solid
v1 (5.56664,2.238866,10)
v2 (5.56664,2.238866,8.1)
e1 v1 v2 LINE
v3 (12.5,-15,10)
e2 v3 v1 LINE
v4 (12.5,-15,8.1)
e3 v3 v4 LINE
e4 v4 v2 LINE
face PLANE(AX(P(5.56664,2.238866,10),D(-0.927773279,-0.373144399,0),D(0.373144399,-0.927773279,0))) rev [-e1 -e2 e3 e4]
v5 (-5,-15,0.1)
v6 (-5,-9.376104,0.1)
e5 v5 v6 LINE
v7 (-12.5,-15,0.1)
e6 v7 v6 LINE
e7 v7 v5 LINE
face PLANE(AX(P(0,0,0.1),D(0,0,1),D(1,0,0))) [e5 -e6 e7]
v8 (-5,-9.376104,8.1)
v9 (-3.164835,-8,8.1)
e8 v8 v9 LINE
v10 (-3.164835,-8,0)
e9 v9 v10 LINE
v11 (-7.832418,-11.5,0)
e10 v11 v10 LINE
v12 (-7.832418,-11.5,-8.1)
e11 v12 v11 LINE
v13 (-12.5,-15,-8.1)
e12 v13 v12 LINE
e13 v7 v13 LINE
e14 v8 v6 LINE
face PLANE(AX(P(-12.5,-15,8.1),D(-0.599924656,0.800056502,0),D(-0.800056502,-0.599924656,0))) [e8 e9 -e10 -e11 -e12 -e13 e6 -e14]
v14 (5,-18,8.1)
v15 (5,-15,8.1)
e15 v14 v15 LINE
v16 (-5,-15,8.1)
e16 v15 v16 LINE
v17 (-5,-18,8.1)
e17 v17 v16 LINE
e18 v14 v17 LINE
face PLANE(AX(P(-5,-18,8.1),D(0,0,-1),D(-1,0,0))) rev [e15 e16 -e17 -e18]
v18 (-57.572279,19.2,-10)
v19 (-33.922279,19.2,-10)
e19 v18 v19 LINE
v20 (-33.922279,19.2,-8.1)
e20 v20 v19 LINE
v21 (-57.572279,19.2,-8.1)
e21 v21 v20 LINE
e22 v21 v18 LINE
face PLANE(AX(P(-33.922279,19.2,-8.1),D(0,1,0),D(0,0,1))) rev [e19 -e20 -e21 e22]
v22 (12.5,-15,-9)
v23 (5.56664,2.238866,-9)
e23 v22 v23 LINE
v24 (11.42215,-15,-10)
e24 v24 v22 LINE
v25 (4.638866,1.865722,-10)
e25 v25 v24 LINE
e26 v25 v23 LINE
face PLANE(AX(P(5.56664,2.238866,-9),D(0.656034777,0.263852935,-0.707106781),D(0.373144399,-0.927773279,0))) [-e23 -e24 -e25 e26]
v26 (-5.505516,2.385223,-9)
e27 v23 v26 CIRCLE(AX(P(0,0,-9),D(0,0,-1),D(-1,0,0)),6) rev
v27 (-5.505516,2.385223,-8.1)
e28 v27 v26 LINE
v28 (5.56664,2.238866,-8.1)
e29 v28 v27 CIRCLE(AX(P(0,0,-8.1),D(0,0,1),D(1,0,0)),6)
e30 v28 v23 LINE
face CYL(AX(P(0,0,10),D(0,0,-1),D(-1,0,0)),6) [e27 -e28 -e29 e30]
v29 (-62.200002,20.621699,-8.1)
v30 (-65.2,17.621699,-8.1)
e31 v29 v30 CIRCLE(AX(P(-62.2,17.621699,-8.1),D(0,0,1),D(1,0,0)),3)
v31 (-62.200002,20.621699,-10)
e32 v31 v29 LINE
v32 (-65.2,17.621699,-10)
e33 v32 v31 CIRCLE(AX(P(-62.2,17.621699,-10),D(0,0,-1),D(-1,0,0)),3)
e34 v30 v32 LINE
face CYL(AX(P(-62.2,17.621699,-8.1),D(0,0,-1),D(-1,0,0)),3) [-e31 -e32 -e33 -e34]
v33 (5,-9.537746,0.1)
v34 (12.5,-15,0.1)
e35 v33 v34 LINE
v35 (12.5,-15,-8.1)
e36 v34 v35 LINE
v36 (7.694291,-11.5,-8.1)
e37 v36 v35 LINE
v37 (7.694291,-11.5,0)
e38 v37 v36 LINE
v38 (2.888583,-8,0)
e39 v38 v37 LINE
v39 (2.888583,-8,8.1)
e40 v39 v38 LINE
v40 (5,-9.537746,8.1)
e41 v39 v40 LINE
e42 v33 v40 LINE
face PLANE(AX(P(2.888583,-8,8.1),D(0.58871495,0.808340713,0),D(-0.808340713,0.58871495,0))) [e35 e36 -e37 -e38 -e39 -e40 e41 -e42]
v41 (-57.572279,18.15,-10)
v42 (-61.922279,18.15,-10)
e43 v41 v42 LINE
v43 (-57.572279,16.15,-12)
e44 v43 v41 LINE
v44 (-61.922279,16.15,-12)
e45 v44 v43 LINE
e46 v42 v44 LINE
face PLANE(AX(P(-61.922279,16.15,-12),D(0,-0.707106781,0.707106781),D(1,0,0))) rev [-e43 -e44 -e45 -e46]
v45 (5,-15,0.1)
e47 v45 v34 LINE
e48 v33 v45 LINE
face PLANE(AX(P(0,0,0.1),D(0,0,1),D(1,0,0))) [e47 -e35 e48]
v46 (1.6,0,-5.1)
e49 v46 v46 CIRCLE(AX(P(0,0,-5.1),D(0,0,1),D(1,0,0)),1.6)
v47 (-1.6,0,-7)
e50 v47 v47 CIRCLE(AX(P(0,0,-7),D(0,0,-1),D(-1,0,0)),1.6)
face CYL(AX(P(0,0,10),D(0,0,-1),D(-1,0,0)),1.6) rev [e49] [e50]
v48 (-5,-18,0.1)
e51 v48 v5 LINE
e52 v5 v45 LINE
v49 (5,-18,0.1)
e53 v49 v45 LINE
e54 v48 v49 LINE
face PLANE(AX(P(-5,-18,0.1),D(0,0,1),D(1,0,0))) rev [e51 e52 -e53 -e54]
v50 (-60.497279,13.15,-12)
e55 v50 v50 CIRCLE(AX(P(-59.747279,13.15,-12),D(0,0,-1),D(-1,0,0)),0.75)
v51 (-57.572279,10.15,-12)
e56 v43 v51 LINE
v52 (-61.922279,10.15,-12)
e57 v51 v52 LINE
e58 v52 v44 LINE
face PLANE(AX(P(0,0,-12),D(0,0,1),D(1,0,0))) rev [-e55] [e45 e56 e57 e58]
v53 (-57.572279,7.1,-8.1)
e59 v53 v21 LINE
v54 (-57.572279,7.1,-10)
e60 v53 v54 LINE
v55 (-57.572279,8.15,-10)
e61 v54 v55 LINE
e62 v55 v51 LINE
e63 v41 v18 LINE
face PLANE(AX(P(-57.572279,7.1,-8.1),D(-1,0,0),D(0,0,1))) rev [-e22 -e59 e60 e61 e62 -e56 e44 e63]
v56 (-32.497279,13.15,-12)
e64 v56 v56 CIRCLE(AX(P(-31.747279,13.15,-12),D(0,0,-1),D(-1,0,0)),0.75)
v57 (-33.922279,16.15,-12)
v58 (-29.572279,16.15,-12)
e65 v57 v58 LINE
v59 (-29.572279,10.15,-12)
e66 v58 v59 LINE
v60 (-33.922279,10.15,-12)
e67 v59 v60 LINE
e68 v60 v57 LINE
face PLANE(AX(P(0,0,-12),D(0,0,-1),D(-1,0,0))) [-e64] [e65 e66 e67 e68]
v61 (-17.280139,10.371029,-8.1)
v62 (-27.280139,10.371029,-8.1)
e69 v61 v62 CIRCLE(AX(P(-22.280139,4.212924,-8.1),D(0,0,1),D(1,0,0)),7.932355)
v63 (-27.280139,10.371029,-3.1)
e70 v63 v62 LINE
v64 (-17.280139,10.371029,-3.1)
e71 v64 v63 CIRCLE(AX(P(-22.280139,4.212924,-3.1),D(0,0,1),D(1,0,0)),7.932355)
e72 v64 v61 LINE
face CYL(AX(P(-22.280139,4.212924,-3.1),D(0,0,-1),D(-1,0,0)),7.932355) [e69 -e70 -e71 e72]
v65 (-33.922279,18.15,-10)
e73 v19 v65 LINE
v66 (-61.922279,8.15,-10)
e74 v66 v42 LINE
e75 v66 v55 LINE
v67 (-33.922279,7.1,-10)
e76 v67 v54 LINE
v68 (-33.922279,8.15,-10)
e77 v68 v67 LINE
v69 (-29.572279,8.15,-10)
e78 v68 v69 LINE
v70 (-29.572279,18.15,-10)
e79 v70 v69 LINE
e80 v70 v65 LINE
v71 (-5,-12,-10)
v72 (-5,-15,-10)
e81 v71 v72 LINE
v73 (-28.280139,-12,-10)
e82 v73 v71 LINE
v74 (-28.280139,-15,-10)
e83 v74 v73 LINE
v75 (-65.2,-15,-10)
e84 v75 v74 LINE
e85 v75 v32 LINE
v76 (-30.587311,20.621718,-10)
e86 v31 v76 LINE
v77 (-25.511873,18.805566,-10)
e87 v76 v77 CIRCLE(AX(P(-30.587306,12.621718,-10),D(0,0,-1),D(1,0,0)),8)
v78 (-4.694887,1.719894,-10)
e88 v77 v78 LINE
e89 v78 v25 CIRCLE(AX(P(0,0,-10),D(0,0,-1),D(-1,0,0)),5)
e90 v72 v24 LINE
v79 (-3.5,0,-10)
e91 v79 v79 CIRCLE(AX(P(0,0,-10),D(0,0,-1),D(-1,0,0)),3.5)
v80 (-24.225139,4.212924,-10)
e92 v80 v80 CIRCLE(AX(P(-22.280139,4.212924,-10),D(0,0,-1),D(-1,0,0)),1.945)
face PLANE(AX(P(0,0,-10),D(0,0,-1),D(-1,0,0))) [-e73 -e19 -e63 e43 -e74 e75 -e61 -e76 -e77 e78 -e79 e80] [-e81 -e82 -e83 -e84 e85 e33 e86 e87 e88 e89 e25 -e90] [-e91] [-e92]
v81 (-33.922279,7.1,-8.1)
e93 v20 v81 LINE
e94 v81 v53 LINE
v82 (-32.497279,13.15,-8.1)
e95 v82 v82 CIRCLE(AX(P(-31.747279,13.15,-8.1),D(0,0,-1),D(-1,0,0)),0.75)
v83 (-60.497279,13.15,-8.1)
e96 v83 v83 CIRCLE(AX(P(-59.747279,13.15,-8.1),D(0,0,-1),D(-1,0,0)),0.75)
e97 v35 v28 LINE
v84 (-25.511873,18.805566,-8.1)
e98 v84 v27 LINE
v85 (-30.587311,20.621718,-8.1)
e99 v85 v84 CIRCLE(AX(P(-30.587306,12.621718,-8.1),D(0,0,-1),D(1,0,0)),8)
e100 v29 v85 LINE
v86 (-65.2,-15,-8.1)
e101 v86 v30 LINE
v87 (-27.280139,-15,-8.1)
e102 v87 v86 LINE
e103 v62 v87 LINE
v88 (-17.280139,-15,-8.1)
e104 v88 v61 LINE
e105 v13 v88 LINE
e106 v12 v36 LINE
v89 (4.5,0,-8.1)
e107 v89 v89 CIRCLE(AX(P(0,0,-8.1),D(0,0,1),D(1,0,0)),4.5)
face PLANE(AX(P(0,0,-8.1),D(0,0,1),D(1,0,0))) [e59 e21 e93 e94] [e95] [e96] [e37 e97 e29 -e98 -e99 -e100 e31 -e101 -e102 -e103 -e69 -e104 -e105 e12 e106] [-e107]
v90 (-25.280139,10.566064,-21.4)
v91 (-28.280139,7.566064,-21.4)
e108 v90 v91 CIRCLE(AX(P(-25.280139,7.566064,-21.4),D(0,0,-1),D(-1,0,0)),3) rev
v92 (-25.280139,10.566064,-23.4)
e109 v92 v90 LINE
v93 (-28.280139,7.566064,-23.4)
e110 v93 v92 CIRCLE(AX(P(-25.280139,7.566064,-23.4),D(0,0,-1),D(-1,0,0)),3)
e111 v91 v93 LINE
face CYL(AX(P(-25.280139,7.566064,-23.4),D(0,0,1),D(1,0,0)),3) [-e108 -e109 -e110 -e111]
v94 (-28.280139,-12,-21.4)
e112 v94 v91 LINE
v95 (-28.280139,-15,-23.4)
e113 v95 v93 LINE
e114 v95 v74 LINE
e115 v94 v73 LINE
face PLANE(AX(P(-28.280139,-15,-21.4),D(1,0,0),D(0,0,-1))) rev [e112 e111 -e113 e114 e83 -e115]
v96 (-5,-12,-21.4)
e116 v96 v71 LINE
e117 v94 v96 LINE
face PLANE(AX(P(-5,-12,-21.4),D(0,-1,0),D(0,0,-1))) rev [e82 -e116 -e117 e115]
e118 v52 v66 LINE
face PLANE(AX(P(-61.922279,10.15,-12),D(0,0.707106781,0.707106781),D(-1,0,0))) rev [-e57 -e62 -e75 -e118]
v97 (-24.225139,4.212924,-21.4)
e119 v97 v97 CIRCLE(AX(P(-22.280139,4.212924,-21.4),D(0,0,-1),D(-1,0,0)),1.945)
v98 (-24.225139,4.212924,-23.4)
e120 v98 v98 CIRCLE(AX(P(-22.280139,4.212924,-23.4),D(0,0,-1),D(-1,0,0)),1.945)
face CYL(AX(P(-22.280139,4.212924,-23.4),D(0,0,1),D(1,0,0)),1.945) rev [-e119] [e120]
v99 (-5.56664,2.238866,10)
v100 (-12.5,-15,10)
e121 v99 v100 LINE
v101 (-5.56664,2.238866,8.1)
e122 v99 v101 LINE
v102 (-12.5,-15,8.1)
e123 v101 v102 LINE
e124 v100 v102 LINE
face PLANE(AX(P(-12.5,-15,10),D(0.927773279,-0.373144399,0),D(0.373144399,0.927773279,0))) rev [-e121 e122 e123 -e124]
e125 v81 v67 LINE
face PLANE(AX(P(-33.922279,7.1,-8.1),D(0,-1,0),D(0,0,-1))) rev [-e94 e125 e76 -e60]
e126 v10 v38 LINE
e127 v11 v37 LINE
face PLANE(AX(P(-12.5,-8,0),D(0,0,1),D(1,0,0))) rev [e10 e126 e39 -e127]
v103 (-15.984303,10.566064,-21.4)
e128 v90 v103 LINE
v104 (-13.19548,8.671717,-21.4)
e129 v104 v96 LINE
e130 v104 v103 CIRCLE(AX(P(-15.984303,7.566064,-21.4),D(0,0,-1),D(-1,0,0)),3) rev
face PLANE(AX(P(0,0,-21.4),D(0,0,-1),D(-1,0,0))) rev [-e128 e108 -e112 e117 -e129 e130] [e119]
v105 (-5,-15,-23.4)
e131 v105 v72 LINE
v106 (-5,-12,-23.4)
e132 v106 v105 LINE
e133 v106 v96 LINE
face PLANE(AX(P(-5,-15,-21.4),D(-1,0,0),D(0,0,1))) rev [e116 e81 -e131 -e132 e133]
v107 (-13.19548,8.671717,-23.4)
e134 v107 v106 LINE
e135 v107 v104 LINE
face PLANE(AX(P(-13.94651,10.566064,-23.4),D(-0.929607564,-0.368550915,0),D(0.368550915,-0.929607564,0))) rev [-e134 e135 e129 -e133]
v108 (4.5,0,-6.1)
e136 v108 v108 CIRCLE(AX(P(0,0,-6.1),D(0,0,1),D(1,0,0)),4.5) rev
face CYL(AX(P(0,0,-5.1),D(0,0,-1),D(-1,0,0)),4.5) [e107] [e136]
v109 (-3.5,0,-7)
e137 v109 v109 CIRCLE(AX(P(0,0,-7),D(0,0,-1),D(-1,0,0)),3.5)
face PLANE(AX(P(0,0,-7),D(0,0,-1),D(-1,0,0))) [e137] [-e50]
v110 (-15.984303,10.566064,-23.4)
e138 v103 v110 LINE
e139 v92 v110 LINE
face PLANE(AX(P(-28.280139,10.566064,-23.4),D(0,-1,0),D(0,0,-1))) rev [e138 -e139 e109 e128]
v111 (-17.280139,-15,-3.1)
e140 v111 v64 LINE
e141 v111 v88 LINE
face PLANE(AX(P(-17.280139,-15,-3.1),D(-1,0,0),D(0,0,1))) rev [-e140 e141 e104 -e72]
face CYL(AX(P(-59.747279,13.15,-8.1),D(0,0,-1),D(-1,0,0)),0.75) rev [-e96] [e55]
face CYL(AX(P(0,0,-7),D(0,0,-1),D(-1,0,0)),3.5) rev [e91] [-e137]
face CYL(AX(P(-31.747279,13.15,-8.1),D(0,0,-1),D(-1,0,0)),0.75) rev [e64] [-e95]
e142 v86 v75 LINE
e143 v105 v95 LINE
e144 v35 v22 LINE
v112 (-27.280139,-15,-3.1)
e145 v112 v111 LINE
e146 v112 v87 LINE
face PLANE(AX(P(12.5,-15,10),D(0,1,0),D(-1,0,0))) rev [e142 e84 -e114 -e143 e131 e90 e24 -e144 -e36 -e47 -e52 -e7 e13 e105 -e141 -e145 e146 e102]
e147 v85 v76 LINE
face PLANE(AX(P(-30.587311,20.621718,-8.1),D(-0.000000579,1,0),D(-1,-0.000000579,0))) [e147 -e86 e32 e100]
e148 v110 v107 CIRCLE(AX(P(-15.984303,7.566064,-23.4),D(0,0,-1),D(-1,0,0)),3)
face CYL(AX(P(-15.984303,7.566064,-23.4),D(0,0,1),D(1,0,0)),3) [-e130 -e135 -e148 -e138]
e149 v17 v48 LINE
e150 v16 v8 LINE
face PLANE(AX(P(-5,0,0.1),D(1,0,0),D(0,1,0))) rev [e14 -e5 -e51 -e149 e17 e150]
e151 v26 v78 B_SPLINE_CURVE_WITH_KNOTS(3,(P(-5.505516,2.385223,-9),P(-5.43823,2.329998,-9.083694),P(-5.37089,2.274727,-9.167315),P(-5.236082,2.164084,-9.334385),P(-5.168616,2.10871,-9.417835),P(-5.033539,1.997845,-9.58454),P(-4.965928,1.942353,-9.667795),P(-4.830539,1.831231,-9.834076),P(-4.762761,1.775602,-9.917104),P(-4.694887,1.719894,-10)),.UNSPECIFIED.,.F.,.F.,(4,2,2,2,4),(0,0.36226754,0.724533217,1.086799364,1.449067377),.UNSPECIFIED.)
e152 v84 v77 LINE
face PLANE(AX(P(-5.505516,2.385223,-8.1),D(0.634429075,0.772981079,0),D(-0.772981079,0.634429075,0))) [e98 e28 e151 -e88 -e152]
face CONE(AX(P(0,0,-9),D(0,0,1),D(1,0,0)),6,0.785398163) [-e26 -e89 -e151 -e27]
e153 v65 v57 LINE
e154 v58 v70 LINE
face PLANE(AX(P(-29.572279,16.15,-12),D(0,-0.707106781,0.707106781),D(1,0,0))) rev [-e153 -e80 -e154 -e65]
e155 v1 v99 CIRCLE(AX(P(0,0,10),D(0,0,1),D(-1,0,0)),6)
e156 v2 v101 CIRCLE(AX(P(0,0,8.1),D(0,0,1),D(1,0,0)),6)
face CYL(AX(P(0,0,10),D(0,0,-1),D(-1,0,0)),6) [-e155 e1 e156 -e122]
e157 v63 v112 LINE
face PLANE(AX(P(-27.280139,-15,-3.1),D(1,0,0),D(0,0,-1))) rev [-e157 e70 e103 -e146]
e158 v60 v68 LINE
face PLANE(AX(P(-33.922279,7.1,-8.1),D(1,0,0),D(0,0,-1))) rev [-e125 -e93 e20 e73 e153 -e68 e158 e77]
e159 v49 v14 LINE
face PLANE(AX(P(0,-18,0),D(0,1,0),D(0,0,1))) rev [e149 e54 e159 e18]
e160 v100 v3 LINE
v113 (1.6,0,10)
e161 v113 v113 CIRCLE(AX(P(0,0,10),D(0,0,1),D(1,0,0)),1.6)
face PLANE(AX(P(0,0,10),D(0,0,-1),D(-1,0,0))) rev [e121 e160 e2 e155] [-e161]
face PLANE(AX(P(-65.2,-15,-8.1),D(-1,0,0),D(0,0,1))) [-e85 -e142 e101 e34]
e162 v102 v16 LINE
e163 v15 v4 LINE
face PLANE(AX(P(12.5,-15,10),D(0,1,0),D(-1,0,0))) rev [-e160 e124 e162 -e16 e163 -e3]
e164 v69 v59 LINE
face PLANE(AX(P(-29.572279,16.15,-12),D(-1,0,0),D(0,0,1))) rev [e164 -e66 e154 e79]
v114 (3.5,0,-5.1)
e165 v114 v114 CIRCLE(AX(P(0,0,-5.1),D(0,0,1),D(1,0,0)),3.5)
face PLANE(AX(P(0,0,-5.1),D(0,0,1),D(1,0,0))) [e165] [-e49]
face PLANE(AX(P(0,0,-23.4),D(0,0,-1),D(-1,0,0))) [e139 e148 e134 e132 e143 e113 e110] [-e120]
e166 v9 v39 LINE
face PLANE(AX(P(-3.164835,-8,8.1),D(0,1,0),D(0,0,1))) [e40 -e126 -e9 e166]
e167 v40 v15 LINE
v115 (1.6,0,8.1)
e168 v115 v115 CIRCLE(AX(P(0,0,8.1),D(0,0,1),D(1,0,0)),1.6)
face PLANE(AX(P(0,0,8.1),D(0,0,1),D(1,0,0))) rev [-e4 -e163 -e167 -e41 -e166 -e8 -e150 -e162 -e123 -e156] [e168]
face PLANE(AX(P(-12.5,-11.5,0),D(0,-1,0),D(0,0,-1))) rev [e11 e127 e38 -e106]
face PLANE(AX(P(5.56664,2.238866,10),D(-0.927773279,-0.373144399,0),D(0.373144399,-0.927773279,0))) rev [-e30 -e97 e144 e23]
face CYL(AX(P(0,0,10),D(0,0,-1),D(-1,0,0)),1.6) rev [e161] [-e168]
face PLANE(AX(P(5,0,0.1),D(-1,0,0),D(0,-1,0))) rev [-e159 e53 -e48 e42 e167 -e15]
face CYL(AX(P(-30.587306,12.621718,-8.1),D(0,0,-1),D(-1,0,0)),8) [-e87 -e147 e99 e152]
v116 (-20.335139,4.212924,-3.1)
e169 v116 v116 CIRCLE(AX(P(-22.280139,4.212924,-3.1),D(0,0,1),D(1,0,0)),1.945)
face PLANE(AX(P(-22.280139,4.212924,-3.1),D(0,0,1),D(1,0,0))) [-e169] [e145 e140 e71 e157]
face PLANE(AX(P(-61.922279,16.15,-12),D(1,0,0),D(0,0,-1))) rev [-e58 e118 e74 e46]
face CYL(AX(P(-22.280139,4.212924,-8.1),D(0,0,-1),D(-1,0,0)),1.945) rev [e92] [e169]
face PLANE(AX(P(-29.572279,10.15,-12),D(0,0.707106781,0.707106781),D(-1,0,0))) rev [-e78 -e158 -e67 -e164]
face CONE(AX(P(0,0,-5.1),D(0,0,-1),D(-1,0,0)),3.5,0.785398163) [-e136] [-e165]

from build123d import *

# Parameters (mm, degrees)
CROQUIS1_R                 = 1.6
SALIENTE_EXTRUIR1_DEPTH    = 10
CORTAR_EXTRUIR1_DEPTH      = 8.1
CORTAR_EXTRUIR1_DEPTH_BACK = 8.1
CORTAR_EXTRUIR2_START      = 8.1
CROQUIS3_OUTSIDE_W         = 34.658
CROQUIS3_OUTSIDE_H         = 30.658
CROQUIS3_OUTSIDE_W_2       = 10
CROQUIS3_OUTSIDE_H_2       = 25.797501395
CORTAR_EXTRUIR2_DEPTH      = 8
CROQUIS4_W                 = 10
CROQUIS4_H                 = 8
SALIENTE_EXTRUIR3_DEPTH    = 3
CORTAR_EXTRUIR3_DEPTH      = 25.088378941
CORTAR_EXTRUIR3_DEPTH_BACK = 25.088378941
CROQUIS5_W                 = 8.1
CROQUIS5_H                 = 3.5
CROQUIS6_R                 = 4.5
CROQUIS6_R_2               = 1.6
SALIENTE_EXTRUIR4_DEPTH    = 3
CHAFL_N1_SIZE              = 1
CROQUIS7_R                 = 3.5
CORTAR_EXTRUIR4_DEPTH      = 3
SALIENTE_EXTRUIR8_START    = -1.9
CROQUIS8_R                 = 0.75
CROQUIS8_R_2               = 1.945
CROQUIS8_W                 = 23.65
CROQUIS8_H                 = 12.1
SALIENTE_EXTRUIR8_DEPTH    = 1.9
SALIENTE_EXTRUIR9_START    = 5
CROQUIS9_R                 = 1.945
SALIENTE_EXTRUIR9_DEPTH    = 5
CROQUIS10_W                = 23.280139212
CROQUIS10_H                = 3
SALIENTE_EXTRUIR10_DEPTH   = 11.4
CROQUIS11_R                = 1.945
SALIENTE_EXTRUIR11_DEPTH   = 2
REDONDEO1_R                = 3
CROQUIS12_W                = 4.35
CROQUIS12_H                = 6
CROQUIS12_R                = 0.75
SALIENTE_EXTRUIR12_DEPTH   = 2
CHAFL_N3_SIZE              = 2
CHAFL_N2_SIZE              = 1


# Some blends are built 0.0001 mm under size
with BuildPart() as part:
    # Croquis1 → Saliente-Extruir1 (new, symmetric)
    with BuildSketch(Plane.XY):
        with BuildLine():
            Line((-12.5, -15), (-5.566639674, 2.238866395))
            ThreePointArc((-5.566639674, 2.238866395), (0, 6), (5.566639674, 2.238866395))
            Line((5.566639674, 2.238866395), (12.5, -15))
            Line((12.5, -15), (-12.5, -15))
        make_face()
        Circle(CROQUIS1_R, mode=Mode.SUBTRACT)
    extrude(amount=SALIENTE_EXTRUIR1_DEPTH, both=True)

    # Croquis2 → Cortar-Extruir1 (cut, two sides: drawn at the far end of the back side and taken through both)
    with BuildSketch(Plane.XY.offset(-CORTAR_EXTRUIR1_DEPTH_BACK)):
        with BuildLine():
            Line((-12.5, -15), (-7.5, 0))
            ThreePointArc((-7.5, 0), (0, 7.5), (7.5, 0))
            Line((7.5, 0), (12.5, -15))
            Line((12.5, -15), (2.888582809, -8))
            Line((2.888582809, -8), (-3.164835235, -8))
            Line((-3.164835235, -8), (-12.5, -15))
        make_face()
    extrude(amount=CORTAR_EXTRUIR1_DEPTH + CORTAR_EXTRUIR1_DEPTH_BACK, mode=Mode.SUBTRACT)

    # Croquis3 outside → Cortar-Extruir2 (cut)
    with BuildSketch(Plane.XY.offset(CORTAR_EXTRUIR2_START)):
        with Locations((0, -4.5)):
            Rectangle(CROQUIS3_OUTSIDE_W, CROQUIS3_OUTSIDE_H)
        with Locations((0, -2.101249303)):
            Rectangle(CROQUIS3_OUTSIDE_W_2, CROQUIS3_OUTSIDE_H_2, mode=Mode.SUBTRACT)
    extrude(amount=-CORTAR_EXTRUIR2_DEPTH, mode=Mode.SUBTRACT)

    # Croquis4 → Saliente-Extruir3 (add)
    with BuildSketch(Plane.XZ.offset(15)):
        with Locations((0, 4.1)):
            Rectangle(CROQUIS4_W, CROQUIS4_H)
    extrude(amount=SALIENTE_EXTRUIR3_DEPTH)

    # Croquis5 → Cortar-Extruir3 (cut, two sides: drawn at the far end of the back side and taken through both)
    with BuildSketch(Plane(origin=(0, 0, 0), x_dir=(0, 0, -1), z_dir=(1, 0, 0)).offset(-CORTAR_EXTRUIR3_DEPTH_BACK)):
        with Locations((4.05, -9.75)):
            Rectangle(CROQUIS5_W, CROQUIS5_H)
    extrude(amount=CORTAR_EXTRUIR3_DEPTH + CORTAR_EXTRUIR3_DEPTH_BACK, mode=Mode.SUBTRACT)

    # Croquis6 → Saliente-Extruir4 (add)
    with BuildSketch(Plane.XY.offset(-8.1)):
        Circle(CROQUIS6_R)
        Circle(CROQUIS6_R_2, mode=Mode.SUBTRACT)
    extrude(amount=SALIENTE_EXTRUIR4_DEPTH)

    # Chaflán1
    chafl_n1_edges = [part.edges().sort_by_distance(p)[0] for p in [
        (-4.5, 0, -5.1),
    ]]
    chamfer(chafl_n1_edges, length=CHAFL_N1_SIZE)

    # Croquis7 → Cortar-Extruir4 (cut)
    with BuildSketch(Plane(origin=(0, 0, -10), x_dir=(-1, 0, 0), z_dir=(0, 0, -1))):
        Circle(CROQUIS7_R)
    extrude(amount=-CORTAR_EXTRUIR4_DEPTH, mode=Mode.SUBTRACT)

    # Croquis8 → Saliente-Extruir8 (add)
    with BuildSketch(Plane(origin=(0, 0, -10), x_dir=(-1, 0, 0), z_dir=(0, 0, -1)).offset(SALIENTE_EXTRUIR8_START)):
        with BuildLine():
            Line((65.2, -15), (65.2, 20.621697606))
            Line((65.2, 20.621697606), (30.587310575, 20.621717655))
            ThreePointArc((30.587310575, 20.621717655), (27.892014915, 20.154008561), (25.511873338, 18.805566286))
            Line((25.511873338, 18.805566286), (5.505516372, 2.38522315))
            ThreePointArc((5.505516372, 2.38522315), (5.536561655, 2.312246753), (5.566639674, 2.238866395))
            Line((5.566639674, 2.238866395), (12.5, -15))
            Line((12.5, -15), (65.2, -15))
        make_face()
        with Locations((59.747279072, 13.15)):
            Circle(CROQUIS8_R, mode=Mode.SUBTRACT)
        with Locations((31.747279072, 13.15)):
            Circle(CROQUIS8_R, mode=Mode.SUBTRACT)
        with Locations((22.280139212, 4.212923787)):
            Circle(CROQUIS8_R_2, mode=Mode.SUBTRACT)
        with Locations((45.747279072, 13.15)):
            Rectangle(CROQUIS8_W, CROQUIS8_H, mode=Mode.SUBTRACT)
    extrude(amount=SALIENTE_EXTRUIR8_DEPTH)

    # Croquis9 → Saliente-Extruir9 (add)
    with BuildSketch(Plane.XY.offset(-8.1).offset(SALIENTE_EXTRUIR9_START)):
        with BuildLine():
            Line((-27.280139212, -15), (-17.280139212, -15))
            Line((-17.280139212, -15), (-17.280139212, 10.371029295))
            ThreePointArc((-17.280139212, 10.371029295), (-22.280139212, 12.145279266), (-27.280139212, 10.371029295))
            Line((-27.280139212, 10.371029295), (-27.280139212, -15))
        make_face()
        with Locations(Location((-22.280139212, 4.212923787, 0), (0, 0, 180))):
            Circle(CROQUIS9_R, mode=Mode.SUBTRACT)
    extrude(amount=-SALIENTE_EXTRUIR9_DEPTH)

    # Croquis10 → Saliente-Extruir10 (add)
    with BuildSketch(Plane(origin=(0, 0, -10), x_dir=(-1, 0, 0), z_dir=(0, 0, -1))):
        with Locations((16.640069606, -13.5)):
            Rectangle(CROQUIS10_W, CROQUIS10_H)
    extrude(amount=SALIENTE_EXTRUIR10_DEPTH)

    # Croquis11 → Saliente-Extruir11 (add)
    with BuildSketch(Plane(origin=(0, 0, -21.4), x_dir=(-1, 0, 0), z_dir=(0, 0, -1))):
        Polygon((28.280139212, -15), (28.280139212, 10.566063957), (13.946510162, 10.566063957), (5, -12), (5, -15), align=None)
        with Locations((22.280139212, 4.212923787)):
            Circle(CROQUIS11_R, mode=Mode.SUBTRACT)
    extrude(amount=SALIENTE_EXTRUIR11_DEPTH)

    # Redondeo1
    redondeo1_edges = [part.edges().sort_by_distance(p)[0] for p in [
        (-65.2, 20.621697606, -9.05),
        (-28.280139212, 10.566063957, -22.4),
        (-13.946510162, 10.566063957, -22.4),
    ]]
    fillet(redondeo1_edges, radius=REDONDEO1_R)

    # Croquis12 → Saliente-Extruir12 (add)
    # profile 1 of 2: a face of its own
    with BuildSketch(Plane(origin=(0, 0, -10), x_dir=(-1, 0, 0), z_dir=(0, 0, -1))):
        with Locations((31.747279072, 13.15)):
            Rectangle(CROQUIS12_W, CROQUIS12_H)
        with Locations((31.747279072, 13.15)):
            Circle(CROQUIS12_R, mode=Mode.SUBTRACT)
    # profile 2 of 2: a face of its own
    with BuildSketch(Plane(origin=(0, 0, -10), x_dir=(-1, 0, 0), z_dir=(0, 0, -1))):
        with Locations((59.747279072, 13.15)):
            Rectangle(CROQUIS12_W, CROQUIS12_H)
        with Locations((59.747279072, 13.15)):
            Circle(CROQUIS12_R, mode=Mode.SUBTRACT)
    extrude(amount=SALIENTE_EXTRUIR12_DEPTH)

    # Chaflán3
    chafl_n3_edges = [part.edges().sort_by_distance(p)[0] for p in [
        (-31.747279072, 16.15, -10),
        (-31.747279072, 10.15, -10),
        (-59.747279072, 10.15, -10),
        (-59.747279072, 16.15, -10),
    ]]
    chamfer(chafl_n3_edges, length=CHAFL_N3_SIZE - 0.0001)  # a hair under: the kernel refuses the full size

    # Chaflán2
    # the kernel refuses this chamfer: 1 mm, written as the material it takes off along each edge
    with BuildSketch(Plane(origin=(0, 0, -10), x_dir=(-0.9997966291820871, -0.020166811253548467, 0), z_dir=(0.020166811253548467, -0.9997966291820871, 0))) as chafl_n2_piece_1_section:
        Polygon((6, -CHAFL_N2_SIZE), (6 - CHAFL_N2_SIZE, 0), (6, 0), align=None)
    chafl_n2_piece_1 = revolve(axis=Axis((0, 0, -10), (0, 0, -1)), revolution_arc=159.245879782, mode=Mode.PRIVATE)
    chafl_n2_piece_1 = split(chafl_n2_piece_1, bisect_by=Plane(origin=(-3.804583519, 0.989171828, -9.513770005), z_dir=(0.6344290754241263, 0.7729810788476574, 0)), keep=Keep.TOP, mode=Mode.PRIVATE)
    add(chafl_n2_piece_1, mode=Mode.SUBTRACT)
    with BuildSketch(Plane(origin=(5.566639674, 2.238866395, -10), x_dir=(0.02550993960358281, 0.01025993235875113, 0.9996219169112968), z_dir=(0.3731443992151493, -0.9277732790581789, 0))) as chafl_n2_piece_2:
        Polygon((CHAFL_N2_SIZE * 0.999621916911, CHAFL_N2_SIZE * 0.0274958766106), (-CHAFL_N2_SIZE * 0.0274958766106, CHAFL_N2_SIZE * 0.999621916911), (0, 0), align=None)
    extrude(amount=21.152587164, mode=Mode.SUBTRACT)


solid = part.part
